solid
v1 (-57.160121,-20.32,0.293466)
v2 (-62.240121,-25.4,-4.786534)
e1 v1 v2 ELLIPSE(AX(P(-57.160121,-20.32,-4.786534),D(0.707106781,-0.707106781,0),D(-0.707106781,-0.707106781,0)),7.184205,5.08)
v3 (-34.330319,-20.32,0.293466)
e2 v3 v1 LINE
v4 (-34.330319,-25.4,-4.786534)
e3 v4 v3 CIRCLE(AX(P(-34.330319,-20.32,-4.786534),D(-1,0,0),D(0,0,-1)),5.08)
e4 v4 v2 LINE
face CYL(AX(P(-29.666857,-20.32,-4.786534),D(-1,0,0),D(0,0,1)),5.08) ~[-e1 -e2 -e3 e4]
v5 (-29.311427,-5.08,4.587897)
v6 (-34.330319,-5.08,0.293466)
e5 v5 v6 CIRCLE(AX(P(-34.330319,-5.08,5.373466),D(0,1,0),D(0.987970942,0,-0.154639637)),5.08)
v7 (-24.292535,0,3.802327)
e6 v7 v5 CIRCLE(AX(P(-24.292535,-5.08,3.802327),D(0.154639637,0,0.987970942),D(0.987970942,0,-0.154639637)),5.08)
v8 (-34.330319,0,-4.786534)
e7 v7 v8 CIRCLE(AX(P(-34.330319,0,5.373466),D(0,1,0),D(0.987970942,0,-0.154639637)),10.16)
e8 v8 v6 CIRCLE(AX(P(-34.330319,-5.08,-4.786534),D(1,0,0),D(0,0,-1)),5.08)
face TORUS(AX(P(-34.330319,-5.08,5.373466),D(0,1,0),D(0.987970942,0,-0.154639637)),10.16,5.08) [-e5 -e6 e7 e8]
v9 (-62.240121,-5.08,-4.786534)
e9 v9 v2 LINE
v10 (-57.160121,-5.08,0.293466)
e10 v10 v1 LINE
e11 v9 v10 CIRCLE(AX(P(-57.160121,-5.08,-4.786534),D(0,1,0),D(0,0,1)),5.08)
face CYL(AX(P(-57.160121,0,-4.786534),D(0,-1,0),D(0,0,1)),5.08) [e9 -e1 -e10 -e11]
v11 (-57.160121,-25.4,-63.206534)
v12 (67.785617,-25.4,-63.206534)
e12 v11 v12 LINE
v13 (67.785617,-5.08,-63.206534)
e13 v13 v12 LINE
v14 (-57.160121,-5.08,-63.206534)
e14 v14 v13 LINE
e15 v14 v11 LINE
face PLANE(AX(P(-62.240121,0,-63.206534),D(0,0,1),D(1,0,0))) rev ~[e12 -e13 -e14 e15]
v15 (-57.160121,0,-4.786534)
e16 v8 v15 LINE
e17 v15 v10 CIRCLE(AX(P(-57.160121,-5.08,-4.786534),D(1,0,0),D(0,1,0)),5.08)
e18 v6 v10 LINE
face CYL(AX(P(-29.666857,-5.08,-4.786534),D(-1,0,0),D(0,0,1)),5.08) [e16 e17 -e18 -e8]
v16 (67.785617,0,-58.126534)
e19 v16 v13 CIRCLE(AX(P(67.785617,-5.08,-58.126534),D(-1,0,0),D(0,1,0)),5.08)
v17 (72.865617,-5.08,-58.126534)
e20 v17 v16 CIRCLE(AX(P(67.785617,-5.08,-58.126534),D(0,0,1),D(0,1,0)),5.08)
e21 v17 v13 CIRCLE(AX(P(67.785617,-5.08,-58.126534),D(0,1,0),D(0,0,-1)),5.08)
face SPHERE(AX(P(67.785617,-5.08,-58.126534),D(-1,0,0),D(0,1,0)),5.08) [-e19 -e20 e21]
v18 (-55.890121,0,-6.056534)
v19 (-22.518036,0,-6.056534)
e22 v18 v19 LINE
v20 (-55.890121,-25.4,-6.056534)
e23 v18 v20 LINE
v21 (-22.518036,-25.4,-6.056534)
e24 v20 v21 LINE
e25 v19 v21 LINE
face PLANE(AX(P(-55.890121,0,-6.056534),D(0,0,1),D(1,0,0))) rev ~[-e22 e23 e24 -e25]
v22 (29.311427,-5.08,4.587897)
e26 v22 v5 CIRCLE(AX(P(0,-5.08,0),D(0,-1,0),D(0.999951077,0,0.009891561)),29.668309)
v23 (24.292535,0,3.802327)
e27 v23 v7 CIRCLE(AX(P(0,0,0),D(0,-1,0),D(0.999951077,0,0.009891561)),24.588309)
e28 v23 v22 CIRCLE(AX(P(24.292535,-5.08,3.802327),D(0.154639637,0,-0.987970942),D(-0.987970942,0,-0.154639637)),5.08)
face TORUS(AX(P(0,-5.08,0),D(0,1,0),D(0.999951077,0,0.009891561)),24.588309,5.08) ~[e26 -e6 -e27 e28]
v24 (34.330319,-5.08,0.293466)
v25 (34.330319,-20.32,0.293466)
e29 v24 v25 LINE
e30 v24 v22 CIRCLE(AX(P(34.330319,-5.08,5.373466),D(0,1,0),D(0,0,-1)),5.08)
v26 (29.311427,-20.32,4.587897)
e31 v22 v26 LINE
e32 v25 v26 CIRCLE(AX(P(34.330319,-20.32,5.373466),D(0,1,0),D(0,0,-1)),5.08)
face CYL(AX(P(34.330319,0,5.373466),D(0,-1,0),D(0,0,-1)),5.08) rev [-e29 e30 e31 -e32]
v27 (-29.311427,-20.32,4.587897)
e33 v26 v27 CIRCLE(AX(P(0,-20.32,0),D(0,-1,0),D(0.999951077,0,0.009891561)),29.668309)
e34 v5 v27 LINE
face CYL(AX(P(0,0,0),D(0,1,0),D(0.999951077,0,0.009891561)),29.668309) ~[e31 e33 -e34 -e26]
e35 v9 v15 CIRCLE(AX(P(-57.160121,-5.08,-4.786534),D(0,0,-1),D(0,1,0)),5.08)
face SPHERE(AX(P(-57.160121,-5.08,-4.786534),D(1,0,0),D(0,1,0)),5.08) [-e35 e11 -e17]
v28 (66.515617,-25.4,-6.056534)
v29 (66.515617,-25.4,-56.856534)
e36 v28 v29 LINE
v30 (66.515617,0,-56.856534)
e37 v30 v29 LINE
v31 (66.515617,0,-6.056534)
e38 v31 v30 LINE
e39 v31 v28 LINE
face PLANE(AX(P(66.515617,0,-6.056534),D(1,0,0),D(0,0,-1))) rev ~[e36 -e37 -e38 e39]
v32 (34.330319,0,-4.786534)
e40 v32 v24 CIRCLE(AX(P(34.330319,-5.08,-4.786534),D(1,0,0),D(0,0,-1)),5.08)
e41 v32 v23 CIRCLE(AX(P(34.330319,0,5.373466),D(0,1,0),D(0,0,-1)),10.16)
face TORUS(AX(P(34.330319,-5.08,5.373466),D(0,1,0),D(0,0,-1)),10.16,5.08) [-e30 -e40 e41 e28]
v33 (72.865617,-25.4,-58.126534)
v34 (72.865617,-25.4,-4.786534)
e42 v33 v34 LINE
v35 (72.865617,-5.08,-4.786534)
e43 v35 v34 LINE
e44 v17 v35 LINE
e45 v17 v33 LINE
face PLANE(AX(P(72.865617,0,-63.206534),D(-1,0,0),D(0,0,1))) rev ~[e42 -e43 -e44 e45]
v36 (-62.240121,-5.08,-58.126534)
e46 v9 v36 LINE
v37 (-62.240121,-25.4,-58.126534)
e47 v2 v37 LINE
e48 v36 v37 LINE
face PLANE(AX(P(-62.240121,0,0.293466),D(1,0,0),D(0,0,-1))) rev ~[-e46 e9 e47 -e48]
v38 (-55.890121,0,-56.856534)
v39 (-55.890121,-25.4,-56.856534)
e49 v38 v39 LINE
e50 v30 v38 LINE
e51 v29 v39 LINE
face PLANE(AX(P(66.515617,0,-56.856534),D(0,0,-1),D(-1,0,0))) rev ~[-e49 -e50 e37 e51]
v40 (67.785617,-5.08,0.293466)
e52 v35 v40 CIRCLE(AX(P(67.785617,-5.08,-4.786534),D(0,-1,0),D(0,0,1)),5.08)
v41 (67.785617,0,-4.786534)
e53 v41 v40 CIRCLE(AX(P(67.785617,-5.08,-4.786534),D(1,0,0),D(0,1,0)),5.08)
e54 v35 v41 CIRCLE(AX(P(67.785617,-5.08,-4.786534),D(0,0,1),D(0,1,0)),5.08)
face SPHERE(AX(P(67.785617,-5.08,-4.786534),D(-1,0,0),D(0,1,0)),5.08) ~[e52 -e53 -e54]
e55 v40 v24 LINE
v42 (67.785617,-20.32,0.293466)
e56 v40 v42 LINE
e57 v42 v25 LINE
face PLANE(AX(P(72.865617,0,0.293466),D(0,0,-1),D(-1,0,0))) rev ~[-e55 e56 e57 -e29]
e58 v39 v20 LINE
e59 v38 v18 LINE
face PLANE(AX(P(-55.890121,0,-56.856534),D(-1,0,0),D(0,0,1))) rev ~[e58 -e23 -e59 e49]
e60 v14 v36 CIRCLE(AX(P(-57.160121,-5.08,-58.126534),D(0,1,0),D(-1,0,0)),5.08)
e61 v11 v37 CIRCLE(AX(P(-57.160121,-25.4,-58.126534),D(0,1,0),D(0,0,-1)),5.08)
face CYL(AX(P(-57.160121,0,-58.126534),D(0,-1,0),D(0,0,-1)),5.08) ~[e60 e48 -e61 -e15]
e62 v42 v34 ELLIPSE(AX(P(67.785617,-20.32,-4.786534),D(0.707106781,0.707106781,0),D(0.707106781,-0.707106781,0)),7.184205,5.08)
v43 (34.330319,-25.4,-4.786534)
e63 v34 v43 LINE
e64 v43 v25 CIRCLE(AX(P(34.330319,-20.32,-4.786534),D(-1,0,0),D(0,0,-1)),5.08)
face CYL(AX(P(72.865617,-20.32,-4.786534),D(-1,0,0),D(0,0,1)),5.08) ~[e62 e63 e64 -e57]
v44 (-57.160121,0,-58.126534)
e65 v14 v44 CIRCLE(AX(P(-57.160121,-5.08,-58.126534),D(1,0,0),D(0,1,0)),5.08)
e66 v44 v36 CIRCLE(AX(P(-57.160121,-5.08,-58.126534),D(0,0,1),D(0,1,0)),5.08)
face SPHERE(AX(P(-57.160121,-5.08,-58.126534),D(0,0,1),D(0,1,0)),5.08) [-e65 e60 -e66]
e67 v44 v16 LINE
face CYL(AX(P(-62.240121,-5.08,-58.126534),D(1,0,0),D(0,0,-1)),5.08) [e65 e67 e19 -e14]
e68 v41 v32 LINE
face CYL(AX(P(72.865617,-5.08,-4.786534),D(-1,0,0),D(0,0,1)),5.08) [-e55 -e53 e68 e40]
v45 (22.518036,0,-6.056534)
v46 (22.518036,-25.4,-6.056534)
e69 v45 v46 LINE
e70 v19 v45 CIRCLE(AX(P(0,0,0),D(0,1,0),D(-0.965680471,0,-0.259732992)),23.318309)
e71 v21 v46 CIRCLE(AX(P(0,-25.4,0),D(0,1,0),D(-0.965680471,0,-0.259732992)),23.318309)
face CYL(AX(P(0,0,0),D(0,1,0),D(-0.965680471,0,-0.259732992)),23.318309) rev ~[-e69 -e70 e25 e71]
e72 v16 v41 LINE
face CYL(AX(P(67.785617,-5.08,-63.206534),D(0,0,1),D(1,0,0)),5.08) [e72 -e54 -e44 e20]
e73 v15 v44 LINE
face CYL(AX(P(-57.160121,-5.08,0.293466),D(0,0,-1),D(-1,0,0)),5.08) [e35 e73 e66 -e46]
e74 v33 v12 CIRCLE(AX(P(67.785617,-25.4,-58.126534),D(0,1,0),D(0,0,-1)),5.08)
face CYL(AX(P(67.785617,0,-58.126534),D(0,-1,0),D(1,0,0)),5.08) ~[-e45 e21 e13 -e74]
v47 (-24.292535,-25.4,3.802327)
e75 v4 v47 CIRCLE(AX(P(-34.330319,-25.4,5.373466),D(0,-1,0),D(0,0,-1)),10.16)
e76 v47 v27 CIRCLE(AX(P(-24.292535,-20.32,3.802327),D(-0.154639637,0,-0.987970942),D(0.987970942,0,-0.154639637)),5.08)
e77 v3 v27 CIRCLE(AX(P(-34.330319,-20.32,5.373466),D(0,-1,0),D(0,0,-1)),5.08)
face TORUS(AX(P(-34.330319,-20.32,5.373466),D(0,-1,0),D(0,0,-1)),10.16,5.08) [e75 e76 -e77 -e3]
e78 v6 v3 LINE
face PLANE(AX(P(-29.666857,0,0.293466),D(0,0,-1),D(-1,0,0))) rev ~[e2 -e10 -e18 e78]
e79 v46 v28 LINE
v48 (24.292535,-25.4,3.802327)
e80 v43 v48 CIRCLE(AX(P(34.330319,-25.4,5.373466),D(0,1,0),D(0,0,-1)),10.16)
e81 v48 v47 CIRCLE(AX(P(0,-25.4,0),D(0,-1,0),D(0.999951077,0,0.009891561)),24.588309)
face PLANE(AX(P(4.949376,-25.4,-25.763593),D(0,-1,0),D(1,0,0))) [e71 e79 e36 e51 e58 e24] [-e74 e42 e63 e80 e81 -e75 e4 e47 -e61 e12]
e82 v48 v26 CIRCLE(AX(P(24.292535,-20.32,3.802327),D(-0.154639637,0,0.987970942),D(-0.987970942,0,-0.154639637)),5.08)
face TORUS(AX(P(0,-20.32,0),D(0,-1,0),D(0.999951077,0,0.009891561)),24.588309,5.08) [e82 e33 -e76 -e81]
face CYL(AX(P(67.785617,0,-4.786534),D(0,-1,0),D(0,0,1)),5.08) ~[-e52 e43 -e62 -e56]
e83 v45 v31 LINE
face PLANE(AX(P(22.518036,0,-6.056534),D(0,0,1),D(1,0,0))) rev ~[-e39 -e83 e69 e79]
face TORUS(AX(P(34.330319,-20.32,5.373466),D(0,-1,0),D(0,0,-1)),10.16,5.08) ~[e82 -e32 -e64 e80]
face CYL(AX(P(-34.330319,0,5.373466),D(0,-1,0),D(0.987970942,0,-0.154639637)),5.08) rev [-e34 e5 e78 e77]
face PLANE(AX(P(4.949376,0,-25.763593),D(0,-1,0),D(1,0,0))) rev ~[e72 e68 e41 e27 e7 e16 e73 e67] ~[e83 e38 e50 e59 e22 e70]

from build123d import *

# Parameters (mm, degrees)
F1_DEPTH = 25.4
F2_R     = 5.08


with BuildPart() as f1:
    # F0 (on Front) → F1 (new body)
    with BuildSketch(Plane.XZ):
        with BuildLine():
            Line((72.8656170726, 0.2934658736), (29.6668574194, 0.2934658736))
            ThreePointArc((29.6668574194, 0.2934658736), (0, 29.6683088726), (-29.6668574194, 0.2934658736))
            Line((-29.6668574194, 0.2934658736), (-62.2401205659, 0.2934658736))
            Line((-62.2401205659, 0.2934658736), (-62.2401205659, -63.2065341264))
            Line((-62.2401205659, -63.2065341264), (72.8656170726, -63.2065341264))
            Line((72.8656170726, -63.2065341264), (72.8656170726, 0.2934658736))
        make_face()
        with BuildLine():
            ThreePointArc((-22.5180355061, -6.0565341264), (0, 23.3183088726), (22.5180355061, -6.0565341264))
            Line((22.5180355061, -6.0565341264), (66.5156170726, -6.0565341264))
            Line((66.5156170726, -6.0565341264), (66.5156170726, -56.8565341264))
            Line((66.5156170726, -56.8565341264), (-55.8901205659, -56.8565341264))
            Line((-55.8901205659, -56.8565341264), (-55.8901205659, -6.0565341264))
            Line((-55.8901205659, -6.0565341264), (-22.5180355061, -6.0565341264))
        make_face(mode=Mode.SUBTRACT)
    extrude(amount=F1_DEPTH)

    # F2
    f2_edges = [f1.edges().sort_by_distance(p)[0] for p in [
        (51.266237, 0, 0.293466),
        (0, 0, 29.668309),
        (-45.953489, 0, 0.293466),
        (-62.240121, 0, -31.456534),
        (5.312748, 0, -63.206534),
        (72.865617, 0, -31.456534),
        (72.865617, -12.7, 0.293466),
        (-62.240121, -12.7, 0.293466),
        (29.666857, -12.7, 0.293466),
        (-29.666857, -12.7, 0.293466),
        (-45.953489, -25.4, 0.293466),
        (-62.240121, -12.7, -63.206534),
        (72.865617, -12.7, -63.206534),
        (51.266237, -25.4, 0.293466),
        (0, -25.4, 29.668309),
    ]]
    fillet(f2_edges, radius=F2_R)


solid = f1.part
